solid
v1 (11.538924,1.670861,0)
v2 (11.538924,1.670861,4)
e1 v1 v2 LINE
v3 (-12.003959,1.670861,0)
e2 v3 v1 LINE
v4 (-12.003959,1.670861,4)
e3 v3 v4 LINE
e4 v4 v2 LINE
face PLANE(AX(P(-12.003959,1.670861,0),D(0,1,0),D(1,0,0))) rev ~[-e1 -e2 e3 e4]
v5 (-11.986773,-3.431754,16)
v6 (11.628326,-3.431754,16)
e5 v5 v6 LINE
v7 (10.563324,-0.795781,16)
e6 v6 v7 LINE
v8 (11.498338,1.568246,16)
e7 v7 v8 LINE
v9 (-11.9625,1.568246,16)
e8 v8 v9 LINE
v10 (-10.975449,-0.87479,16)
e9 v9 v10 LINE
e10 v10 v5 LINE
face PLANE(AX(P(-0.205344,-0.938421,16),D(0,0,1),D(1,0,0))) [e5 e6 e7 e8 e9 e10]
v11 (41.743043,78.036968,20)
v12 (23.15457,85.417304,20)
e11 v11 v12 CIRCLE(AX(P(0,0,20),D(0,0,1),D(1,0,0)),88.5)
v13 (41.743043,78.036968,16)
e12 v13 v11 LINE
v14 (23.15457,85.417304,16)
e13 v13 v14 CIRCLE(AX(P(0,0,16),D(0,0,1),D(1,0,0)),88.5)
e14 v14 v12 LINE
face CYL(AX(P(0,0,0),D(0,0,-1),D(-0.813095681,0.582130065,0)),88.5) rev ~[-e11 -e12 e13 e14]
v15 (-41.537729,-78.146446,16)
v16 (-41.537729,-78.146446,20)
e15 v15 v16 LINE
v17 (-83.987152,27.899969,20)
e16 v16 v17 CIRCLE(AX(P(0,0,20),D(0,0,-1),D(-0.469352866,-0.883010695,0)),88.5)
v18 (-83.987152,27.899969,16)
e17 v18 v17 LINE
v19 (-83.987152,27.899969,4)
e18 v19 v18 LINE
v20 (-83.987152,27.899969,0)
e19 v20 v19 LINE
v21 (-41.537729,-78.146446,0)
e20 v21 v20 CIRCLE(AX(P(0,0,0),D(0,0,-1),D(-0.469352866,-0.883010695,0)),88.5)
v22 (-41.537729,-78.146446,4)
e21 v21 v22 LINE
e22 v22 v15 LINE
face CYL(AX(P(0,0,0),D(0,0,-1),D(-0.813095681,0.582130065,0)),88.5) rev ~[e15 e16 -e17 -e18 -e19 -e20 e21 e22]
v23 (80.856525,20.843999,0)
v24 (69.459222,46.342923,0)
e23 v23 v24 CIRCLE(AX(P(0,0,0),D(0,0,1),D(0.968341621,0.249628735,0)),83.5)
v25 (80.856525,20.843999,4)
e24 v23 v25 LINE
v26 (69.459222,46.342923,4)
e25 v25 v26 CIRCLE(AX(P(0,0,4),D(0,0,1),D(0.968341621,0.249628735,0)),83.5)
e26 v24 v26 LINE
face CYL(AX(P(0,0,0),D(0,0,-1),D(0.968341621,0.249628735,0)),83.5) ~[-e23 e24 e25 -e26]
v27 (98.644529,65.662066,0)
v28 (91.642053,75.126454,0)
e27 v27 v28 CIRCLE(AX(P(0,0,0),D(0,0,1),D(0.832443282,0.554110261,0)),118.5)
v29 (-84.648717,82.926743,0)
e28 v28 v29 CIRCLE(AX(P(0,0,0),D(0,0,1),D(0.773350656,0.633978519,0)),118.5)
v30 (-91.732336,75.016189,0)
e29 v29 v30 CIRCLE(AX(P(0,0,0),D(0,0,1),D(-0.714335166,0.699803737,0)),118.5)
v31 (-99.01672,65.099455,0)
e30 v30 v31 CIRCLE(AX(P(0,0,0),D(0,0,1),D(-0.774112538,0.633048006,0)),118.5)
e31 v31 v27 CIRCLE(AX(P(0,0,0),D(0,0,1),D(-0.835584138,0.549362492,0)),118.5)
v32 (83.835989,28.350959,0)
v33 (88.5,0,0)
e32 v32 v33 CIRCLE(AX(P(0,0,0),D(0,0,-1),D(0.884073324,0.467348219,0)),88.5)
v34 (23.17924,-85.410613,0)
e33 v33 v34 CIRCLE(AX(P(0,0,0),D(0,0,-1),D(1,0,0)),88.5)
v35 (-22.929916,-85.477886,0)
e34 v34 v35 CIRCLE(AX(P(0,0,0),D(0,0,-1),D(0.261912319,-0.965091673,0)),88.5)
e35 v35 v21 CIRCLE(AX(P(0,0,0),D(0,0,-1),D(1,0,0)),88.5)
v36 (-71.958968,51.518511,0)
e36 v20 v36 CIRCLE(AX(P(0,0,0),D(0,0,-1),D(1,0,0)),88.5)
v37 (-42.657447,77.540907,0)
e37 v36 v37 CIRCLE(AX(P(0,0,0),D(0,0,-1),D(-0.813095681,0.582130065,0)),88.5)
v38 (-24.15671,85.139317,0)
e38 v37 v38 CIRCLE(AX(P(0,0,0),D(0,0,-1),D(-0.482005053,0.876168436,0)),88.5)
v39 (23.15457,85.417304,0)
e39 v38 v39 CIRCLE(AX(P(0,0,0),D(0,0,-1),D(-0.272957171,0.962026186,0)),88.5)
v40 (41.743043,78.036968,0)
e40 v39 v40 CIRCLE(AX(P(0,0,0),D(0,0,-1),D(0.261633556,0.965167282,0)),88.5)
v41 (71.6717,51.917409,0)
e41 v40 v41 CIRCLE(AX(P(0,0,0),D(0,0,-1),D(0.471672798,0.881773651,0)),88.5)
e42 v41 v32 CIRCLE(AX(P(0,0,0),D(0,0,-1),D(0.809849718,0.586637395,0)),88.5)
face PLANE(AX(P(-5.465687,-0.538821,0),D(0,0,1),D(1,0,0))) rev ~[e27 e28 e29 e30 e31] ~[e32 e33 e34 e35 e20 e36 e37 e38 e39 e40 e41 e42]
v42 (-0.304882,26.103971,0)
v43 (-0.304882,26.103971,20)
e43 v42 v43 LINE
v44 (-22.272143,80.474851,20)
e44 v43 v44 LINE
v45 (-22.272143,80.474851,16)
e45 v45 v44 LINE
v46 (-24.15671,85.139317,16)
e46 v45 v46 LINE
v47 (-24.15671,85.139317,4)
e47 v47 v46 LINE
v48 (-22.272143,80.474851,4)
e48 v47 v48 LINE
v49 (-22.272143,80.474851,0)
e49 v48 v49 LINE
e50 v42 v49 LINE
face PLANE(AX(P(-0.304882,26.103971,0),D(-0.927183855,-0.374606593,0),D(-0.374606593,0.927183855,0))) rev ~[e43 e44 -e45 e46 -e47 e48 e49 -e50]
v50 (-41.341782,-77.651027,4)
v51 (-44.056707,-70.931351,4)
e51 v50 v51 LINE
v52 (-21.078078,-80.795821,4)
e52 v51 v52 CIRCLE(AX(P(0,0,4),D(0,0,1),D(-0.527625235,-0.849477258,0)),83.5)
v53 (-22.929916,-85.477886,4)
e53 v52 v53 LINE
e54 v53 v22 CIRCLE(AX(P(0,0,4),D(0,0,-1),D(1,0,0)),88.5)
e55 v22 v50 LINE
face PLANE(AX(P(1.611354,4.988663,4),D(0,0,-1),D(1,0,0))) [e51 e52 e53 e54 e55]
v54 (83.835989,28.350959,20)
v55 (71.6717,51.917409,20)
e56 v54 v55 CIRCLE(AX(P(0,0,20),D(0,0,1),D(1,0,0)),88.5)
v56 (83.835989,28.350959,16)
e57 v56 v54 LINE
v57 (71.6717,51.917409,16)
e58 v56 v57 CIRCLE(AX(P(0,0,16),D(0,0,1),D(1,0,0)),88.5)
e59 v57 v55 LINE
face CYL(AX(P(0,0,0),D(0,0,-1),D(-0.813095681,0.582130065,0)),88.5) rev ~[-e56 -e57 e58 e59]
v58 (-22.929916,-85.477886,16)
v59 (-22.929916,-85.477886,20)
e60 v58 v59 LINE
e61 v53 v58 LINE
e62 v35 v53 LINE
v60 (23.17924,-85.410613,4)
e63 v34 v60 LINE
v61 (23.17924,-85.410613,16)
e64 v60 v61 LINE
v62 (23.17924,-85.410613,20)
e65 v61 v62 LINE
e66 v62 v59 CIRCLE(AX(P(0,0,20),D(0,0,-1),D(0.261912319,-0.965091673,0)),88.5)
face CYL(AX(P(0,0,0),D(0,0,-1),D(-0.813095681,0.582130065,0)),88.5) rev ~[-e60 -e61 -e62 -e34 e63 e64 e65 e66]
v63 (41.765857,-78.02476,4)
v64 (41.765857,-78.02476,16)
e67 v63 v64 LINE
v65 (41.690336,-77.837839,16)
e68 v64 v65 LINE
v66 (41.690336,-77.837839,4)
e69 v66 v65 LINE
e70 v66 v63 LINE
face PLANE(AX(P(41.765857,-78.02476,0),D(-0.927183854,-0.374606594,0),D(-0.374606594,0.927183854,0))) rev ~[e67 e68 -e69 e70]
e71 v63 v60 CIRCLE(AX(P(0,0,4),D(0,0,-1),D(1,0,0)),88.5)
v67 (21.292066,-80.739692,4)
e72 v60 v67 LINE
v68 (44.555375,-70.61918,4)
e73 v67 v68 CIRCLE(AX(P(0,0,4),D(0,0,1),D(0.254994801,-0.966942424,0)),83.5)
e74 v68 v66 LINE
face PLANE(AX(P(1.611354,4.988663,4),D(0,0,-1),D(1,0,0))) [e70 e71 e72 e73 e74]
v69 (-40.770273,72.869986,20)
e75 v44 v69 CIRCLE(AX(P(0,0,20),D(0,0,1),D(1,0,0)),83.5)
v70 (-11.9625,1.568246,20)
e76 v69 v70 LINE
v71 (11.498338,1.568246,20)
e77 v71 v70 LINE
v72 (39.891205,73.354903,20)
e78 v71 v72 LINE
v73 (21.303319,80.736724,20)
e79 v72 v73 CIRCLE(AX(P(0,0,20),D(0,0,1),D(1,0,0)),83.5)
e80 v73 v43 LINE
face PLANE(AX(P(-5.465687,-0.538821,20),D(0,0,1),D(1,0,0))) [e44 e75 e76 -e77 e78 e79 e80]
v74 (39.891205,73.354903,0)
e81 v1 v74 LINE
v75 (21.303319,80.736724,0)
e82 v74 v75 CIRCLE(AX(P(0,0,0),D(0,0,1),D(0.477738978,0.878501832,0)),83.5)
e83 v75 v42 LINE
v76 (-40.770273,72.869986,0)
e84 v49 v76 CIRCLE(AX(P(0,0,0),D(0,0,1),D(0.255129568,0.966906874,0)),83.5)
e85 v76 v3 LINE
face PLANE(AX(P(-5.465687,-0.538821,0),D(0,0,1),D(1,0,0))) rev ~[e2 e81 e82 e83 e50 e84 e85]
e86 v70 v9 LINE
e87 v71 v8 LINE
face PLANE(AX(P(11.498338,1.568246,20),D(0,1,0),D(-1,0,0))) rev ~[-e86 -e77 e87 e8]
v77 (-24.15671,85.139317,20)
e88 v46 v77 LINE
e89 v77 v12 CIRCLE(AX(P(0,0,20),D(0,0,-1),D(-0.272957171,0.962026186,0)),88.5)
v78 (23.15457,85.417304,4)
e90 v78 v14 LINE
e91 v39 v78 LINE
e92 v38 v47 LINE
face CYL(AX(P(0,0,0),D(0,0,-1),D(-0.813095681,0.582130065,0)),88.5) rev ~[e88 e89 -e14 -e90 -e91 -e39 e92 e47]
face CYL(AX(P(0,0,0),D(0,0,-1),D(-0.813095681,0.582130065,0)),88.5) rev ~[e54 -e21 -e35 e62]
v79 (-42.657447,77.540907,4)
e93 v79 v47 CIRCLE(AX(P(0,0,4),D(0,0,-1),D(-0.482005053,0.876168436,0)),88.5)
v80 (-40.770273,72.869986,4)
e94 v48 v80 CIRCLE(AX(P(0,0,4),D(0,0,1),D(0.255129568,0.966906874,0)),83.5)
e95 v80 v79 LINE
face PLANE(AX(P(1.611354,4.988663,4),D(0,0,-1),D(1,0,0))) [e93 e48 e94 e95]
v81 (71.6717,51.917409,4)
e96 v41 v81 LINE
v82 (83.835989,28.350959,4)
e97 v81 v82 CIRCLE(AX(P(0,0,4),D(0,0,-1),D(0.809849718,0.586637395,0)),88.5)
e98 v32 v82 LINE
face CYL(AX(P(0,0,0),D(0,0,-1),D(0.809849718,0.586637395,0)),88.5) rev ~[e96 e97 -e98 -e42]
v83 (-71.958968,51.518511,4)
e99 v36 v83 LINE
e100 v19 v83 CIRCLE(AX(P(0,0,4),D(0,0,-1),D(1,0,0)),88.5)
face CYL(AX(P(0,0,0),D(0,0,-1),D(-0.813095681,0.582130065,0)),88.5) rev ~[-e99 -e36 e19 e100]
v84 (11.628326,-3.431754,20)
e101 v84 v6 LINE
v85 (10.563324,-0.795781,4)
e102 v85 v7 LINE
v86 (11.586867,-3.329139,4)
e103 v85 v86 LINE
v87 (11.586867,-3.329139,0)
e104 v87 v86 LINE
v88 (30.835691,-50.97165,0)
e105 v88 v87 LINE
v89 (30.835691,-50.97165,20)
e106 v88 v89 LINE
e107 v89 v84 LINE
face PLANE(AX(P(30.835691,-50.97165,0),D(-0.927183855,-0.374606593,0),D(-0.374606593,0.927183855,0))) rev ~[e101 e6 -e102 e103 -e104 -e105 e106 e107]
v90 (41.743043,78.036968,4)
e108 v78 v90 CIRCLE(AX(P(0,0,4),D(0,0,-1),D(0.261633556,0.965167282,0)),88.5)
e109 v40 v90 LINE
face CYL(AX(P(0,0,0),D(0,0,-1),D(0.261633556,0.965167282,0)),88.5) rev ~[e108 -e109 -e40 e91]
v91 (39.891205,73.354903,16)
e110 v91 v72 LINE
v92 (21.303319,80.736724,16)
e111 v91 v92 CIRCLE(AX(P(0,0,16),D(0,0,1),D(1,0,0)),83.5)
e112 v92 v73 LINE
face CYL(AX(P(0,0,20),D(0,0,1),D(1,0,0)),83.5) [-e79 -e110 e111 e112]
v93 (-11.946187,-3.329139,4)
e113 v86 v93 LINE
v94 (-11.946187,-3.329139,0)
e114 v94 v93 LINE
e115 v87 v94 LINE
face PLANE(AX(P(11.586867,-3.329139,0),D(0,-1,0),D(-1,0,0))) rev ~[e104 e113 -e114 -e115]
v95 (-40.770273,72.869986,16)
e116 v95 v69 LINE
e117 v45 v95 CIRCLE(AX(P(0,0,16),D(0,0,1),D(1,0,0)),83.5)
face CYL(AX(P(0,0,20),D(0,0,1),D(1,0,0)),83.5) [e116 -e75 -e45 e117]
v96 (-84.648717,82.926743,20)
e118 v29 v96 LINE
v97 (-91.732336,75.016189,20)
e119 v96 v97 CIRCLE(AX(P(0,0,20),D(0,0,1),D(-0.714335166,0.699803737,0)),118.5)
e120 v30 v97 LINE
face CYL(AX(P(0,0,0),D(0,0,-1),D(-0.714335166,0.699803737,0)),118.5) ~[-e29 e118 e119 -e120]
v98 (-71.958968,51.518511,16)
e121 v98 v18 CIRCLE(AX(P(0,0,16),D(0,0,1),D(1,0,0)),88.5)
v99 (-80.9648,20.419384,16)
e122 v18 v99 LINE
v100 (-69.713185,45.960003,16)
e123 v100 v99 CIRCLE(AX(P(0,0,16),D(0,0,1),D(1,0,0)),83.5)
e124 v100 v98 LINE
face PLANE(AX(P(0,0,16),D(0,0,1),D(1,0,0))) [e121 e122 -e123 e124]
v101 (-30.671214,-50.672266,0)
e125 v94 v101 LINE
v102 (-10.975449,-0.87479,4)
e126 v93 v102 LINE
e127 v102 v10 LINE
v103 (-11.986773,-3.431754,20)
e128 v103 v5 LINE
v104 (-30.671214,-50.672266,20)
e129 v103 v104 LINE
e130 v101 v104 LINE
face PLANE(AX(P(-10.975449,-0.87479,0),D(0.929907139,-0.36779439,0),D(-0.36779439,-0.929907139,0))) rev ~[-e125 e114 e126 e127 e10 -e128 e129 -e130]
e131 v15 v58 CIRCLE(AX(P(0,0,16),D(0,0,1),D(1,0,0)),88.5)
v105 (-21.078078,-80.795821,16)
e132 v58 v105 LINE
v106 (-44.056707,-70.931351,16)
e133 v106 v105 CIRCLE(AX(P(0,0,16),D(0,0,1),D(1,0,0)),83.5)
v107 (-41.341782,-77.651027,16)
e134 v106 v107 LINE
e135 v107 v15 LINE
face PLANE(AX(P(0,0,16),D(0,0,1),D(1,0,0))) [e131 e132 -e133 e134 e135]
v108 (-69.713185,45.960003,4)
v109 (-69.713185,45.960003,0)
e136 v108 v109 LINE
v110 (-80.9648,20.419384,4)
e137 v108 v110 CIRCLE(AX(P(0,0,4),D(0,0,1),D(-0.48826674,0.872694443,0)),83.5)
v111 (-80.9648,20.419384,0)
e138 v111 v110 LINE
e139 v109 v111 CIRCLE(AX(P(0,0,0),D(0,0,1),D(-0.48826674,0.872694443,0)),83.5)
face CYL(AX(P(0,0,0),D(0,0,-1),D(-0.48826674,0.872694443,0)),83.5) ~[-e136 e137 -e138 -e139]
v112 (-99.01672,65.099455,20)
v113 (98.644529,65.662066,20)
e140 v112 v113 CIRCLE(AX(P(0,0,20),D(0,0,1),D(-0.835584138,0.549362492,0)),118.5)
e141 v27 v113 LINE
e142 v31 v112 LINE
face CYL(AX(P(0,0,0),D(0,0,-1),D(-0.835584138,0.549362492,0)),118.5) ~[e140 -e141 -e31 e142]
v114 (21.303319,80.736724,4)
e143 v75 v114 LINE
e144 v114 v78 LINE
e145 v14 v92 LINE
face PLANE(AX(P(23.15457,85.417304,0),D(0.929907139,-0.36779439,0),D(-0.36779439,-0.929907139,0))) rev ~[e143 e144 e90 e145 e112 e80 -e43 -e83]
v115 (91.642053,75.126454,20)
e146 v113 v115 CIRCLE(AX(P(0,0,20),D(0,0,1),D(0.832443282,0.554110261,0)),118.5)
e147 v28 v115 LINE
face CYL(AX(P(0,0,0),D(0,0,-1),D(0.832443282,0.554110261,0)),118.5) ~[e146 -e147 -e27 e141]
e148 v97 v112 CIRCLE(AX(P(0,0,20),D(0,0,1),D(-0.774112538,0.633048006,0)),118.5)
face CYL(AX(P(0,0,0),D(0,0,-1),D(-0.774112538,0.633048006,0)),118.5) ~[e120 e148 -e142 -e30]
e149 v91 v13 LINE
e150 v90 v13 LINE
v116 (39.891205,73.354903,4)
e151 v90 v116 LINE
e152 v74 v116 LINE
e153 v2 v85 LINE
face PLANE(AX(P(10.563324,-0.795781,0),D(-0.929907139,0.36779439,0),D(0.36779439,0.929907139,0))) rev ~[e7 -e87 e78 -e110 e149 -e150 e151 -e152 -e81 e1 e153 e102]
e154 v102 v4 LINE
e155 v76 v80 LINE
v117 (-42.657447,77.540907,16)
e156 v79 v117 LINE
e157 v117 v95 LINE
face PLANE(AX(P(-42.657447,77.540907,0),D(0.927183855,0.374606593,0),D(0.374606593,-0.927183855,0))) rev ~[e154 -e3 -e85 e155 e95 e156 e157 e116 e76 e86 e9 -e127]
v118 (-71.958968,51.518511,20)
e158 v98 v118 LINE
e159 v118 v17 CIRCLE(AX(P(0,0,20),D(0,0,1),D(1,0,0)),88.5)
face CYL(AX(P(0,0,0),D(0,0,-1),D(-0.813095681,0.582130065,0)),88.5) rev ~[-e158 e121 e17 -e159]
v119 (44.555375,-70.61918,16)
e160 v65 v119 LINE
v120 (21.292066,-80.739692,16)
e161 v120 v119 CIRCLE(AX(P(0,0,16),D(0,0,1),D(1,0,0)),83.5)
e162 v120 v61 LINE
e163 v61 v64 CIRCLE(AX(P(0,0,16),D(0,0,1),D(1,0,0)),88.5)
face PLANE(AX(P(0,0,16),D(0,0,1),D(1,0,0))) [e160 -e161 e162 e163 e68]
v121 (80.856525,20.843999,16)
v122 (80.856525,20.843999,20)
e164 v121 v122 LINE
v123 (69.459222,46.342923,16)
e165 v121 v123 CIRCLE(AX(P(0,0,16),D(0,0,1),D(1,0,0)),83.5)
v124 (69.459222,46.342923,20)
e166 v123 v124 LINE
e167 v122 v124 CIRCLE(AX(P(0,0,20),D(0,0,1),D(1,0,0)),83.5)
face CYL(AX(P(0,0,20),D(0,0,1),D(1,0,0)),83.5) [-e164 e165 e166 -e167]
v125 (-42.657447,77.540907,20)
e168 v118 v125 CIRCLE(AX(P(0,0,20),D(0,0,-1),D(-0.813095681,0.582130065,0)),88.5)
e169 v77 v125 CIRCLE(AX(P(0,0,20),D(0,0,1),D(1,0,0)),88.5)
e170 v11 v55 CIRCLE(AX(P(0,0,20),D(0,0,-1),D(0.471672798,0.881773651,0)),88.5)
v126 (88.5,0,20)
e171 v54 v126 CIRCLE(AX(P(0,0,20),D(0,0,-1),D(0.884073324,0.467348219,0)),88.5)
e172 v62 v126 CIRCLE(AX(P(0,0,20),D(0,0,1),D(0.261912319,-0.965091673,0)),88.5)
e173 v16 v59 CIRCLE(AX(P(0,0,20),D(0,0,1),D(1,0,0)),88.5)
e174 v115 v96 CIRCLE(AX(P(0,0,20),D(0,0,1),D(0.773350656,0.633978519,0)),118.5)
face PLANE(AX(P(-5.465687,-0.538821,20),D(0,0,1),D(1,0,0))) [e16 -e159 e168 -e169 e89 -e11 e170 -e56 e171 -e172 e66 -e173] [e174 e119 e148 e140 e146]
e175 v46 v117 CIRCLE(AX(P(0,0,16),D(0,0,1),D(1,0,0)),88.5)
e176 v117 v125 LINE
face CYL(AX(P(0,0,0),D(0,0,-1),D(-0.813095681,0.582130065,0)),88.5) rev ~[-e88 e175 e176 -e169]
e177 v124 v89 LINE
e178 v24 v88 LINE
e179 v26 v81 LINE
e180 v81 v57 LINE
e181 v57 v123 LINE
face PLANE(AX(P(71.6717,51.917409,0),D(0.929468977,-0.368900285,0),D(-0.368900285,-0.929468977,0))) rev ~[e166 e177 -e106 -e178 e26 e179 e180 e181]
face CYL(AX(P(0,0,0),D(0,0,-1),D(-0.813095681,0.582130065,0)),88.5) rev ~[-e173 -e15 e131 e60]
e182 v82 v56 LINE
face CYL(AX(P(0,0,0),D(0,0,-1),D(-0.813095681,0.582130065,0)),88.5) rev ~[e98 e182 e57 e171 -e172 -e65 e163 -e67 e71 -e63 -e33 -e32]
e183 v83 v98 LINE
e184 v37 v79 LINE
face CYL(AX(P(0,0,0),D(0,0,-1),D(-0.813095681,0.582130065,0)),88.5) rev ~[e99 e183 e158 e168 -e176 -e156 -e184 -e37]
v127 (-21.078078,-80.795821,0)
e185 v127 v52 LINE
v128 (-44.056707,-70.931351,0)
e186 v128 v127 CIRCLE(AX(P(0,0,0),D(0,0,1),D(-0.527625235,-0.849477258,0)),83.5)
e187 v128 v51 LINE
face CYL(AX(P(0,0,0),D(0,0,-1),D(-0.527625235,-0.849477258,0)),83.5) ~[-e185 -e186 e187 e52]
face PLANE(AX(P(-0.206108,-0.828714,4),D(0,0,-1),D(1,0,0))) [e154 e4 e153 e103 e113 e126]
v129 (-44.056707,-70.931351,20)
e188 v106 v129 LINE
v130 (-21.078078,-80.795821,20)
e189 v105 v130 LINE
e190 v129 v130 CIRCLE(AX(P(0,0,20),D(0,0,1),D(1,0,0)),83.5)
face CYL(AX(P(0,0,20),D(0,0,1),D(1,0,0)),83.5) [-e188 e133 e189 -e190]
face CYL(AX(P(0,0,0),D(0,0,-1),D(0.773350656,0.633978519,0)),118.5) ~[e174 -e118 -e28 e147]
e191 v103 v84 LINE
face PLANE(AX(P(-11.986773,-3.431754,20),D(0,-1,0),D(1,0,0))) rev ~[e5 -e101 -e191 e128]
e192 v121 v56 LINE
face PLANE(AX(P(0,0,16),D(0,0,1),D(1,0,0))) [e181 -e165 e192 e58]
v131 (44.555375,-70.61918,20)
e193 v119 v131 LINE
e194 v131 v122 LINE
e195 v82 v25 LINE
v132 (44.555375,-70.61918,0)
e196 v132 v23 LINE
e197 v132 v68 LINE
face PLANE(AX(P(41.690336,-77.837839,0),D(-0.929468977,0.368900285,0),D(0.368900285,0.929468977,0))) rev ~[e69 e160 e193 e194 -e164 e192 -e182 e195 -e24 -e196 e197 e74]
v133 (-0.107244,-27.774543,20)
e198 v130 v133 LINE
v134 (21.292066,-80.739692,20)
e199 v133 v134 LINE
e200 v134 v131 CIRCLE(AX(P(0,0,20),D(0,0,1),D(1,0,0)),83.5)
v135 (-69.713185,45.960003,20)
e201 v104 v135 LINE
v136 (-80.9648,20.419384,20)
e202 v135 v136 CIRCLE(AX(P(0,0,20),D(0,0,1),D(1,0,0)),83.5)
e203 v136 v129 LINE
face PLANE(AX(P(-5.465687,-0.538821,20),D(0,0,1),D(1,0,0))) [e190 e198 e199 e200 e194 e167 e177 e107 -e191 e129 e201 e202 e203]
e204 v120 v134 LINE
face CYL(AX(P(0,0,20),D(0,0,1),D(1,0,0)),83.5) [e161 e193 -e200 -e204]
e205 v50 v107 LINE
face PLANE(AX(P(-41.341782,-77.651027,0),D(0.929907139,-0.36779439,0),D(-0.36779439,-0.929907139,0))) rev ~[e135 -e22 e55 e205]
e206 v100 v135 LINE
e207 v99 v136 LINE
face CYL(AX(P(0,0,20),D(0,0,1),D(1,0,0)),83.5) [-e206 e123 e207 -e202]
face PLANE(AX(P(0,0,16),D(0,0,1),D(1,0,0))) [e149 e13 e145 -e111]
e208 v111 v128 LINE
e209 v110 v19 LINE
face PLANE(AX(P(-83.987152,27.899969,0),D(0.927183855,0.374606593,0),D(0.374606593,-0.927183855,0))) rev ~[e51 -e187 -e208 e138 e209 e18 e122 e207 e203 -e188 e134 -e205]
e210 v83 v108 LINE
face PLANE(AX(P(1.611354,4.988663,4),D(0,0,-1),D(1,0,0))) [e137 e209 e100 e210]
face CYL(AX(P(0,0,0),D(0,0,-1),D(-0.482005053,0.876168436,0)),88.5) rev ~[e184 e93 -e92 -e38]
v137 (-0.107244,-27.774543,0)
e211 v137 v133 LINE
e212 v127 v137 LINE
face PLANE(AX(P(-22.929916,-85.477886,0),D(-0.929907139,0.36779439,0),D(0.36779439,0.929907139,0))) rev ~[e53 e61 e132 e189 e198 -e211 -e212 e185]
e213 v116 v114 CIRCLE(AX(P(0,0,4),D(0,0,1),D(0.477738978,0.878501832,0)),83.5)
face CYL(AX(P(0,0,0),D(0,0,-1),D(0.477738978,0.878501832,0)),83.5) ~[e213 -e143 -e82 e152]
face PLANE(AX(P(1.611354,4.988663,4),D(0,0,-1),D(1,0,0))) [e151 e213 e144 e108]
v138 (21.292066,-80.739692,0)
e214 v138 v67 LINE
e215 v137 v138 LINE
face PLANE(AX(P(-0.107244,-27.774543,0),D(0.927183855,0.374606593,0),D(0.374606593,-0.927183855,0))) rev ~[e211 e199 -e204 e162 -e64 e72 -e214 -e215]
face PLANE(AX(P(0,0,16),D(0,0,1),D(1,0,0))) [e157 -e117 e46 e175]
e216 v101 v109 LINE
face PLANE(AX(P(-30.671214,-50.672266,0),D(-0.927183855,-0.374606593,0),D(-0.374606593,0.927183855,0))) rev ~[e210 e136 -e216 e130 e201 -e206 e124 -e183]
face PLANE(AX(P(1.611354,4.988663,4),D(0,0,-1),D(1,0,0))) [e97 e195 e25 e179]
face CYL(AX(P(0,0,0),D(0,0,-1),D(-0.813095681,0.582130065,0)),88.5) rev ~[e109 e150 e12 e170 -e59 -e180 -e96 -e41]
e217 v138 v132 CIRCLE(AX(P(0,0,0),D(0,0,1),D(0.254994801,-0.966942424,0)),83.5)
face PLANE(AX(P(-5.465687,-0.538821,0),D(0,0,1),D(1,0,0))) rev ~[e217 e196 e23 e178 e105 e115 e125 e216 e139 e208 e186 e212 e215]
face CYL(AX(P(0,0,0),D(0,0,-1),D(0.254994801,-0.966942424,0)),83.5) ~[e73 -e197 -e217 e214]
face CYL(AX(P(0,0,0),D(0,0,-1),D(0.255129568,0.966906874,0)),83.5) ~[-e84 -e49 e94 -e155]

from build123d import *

# Parameters (mm, degrees)
F1_DEPTH  = 20
F3_DEPTH  = 20
F2_R      = 88.5
F2_R_2    = 83.5
F4_DEPTH  = 4
F6_DEPTH  = 4
F8_DEPTH  = 4
F10_DEPTH = 4


with BuildPart() as f1:
    # F0 (on Top) → F1 (new body)
    with BuildSketch(Plane.XY):
        with BuildLine():
            ThreePointArc((-99.0167204009, 65.0994553054), (-33.976231637, -113.5247359995), (118.5, 0))
            ThreePointArc((118.5, 0), (113.427568701, 34.2992224195), (98.6445289691, 65.6620659473))
            Line((98.6445289691, 65.6620659473), (83.8359894773, 28.3509588615))
            ThreePointArc((83.8359894773, 28.3509588615), (87.3262133289, 14.3660177374), (88.5, 0))
            ThreePointArc((88.5, 0), (75.9227513097, -45.4751122436), (41.7658568686, -78.0247601729))
            ThreePointArc((41.7658568686, -78.0247601729), (37.4975464632, -80.1634830159), (33.1201145514, -82.0689223282))
            ThreePointArc((33.1201145514, -82.0689223282), (28.1992209584, -83.8871500132), (23.1792402745, -85.4106130425))
            ThreePointArc((23.1792402745, -85.4106130425), (0.1291202837, -88.4999058076), (-22.9299160381, -85.4778857395))
            ThreePointArc((-22.9299160381, -85.4778857395), (-27.7305413867, -84.0432452634), (-32.4422838504, -82.3392264876))
            ThreePointArc((-32.4422838504, -82.3392264876), (-37.0493645428, -80.3716031131), (-41.5377286395, -78.1464464929))
            ThreePointArc((-41.5377286395, -78.1464464929), (-82.1619405668, -32.888683803), (-83.9871522499, 27.8999687625))
            Line((-83.9871522499, 27.8999687625), (-99.0167204009, 65.0994553054))
        make_face()
        with BuildLine():
            Line((83.8359894773, 28.3509588615), (98.6445289691, 65.6620659473))
            ThreePointArc((98.6445289691, 65.6620659473), (95.2609020622, 70.4812779275), (91.6420527878, 75.1264544673))
            Line((91.6420527878, 75.1264544673), (78.2404891828, 41.3603173639))
            ThreePointArc((78.2404891828, 41.3603173639), (81.2988750591, 34.9677410499), (83.8359894773, 28.3509588615))
        make_face()
        with BuildLine():
            ThreePointArc((-91.7323358048, 75.0161887049), (-95.5033298433, 70.1524339481), (-99.0167204009, 65.0994553054))
            Line((-99.0167204009, 65.0994553054), (-83.9871522499, 27.8999687625))
            ThreePointArc((-83.9871522499, 27.8999687625), (-81.3673031633, 34.8082170749), (-78.1803580333, 41.4738666848))
            Line((-78.1803580333, 41.4738666848), (-91.7323358048, 75.0161887049))
        make_face()
        with BuildLine():
            Line((78.2404891828, 41.3603173639), (91.6420527878, 75.1264544673))
            ThreePointArc((91.6420527878, 75.1264544673), (88.0042632721, 79.3567870187), (84.1713836102, 83.4111993748))
            Line((84.1713836102, 83.4111993748), (71.6717000696, 51.9174094994))
            ThreePointArc((71.6717000696, 51.9174094994), (75.141727224, 46.7543669597), (78.2404891828, 41.3603173639))
        make_face()
        with BuildLine():
            ThreePointArc((-84.6487172303, 82.9267427991), (-88.279177522, 79.0508495593), (-91.7323358048, 75.0161887049))
            Line((-91.7323358048, 75.0161887049), (-78.1803580333, 41.4738666848))
            ThreePointArc((-78.1803580333, 41.4738666848), (-75.2374774209, 46.6001286623), (-71.9589677924, 51.5185107923))
            Line((-71.9589677924, 51.5185107923), (-84.6487172303, 82.9267427991))
        make_face()
        with BuildLine():
            Line((71.6717000696, 51.9174094994), (84.1713836102, 83.4111993748))
            ThreePointArc((84.1713836102, 83.4111993748), (-0.34005351, 118.4995120817), (-84.6487172303, 82.9267427991))
            Line((-84.6487172303, 82.9267427991), (-71.9589677924, 51.5185107923))
            ThreePointArc((-71.9589677924, 51.5185107923), (-58.7666735297, 66.1719584285), (-42.657447205, 77.5409066104))
            ThreePointArc((-42.657447205, 77.5409066104), (-37.9880889567, 79.9321906207), (-33.1852472612, 82.0426070052))
            ThreePointArc((-33.1852472612, 82.0426070052), (-28.7127568961, 83.7127683894), (-24.1567096164, 85.1393174774))
            ThreePointArc((-24.1567096164, 85.1393174774), (-0.5199906824, 88.4984723579), (23.1545696711, 85.4173044725))
            ThreePointArc((23.1545696711, 85.4173044725), (27.9506996195, 83.9702827837), (32.6572676565, 82.2541966663))
            ThreePointArc((32.6572676565, 82.2541966663), (37.2598684434, 80.274231255), (41.7430426186, 78.0369681173))
            ThreePointArc((41.7430426186, 78.0369681173), (58.1917846466, 66.6780788538), (71.6717000696, 51.9174094994))
        make_face()
    extrude(amount=F1_DEPTH)

    # F0 (on Top) → F3 (join)
    with BuildSketch(Plane.XY):
        Polygon((-5.3900272877, 13.2470234608), (-10.9754492604, -0.8747899922), (-5.5413465001, -14.3246662942), (0.0440754726, -0.2028528412), align=None)
        Polygon((-5.5413465001, -14.3246662942), (-0.1072437399, -27.7745425962), (5.4781782329, -13.6527291432), (0.0440754726, -0.2028528412), align=None)
        Polygon((5.4781782329, -13.6527291432), (10.5633239718, -0.7957812068), (5.1292212115, 12.6540950952), (0.0440754726, -0.2028528412), align=None)
        Polygon((0.0440754726, -0.2028528412), (5.1292212115, 12.6540950952), (-0.3048815487, 26.1039713972), (-5.3900272877, 13.2470234608), align=None)
        Polygon((-10.9754492604, -0.8747899922), (-30.6712140088, -50.6722658047), (-25.2371112485, -64.1221421067), (-5.5413465001, -14.3246662942), align=None)
        with BuildLine():
            Line((-25.2371112485, -64.1221421067), (-32.4422838504, -82.3392264876))
            ThreePointArc((-32.4422838504, -82.3392264876), (-27.7305413867, -84.0432452634), (-22.9299160381, -85.4778857395))
            Line((-22.9299160381, -85.4778857395), (-0.1072437399, -27.7745425962))
            Line((-0.1072437399, -27.7745425962), (-5.5413465001, -14.3246662942))
            Line((-5.5413465001, -14.3246662942), (-25.2371112485, -64.1221421067))
        make_face()
        with BuildLine():
            Line((-41.3417817205, -77.6510271941), (-41.5377286395, -78.1464464929))
            ThreePointArc((-41.5377286395, -78.1464464929), (-37.0493645428, -80.3716031131), (-32.4422838504, -82.3392264876))
            Line((-32.4422838504, -82.3392264876), (-25.2371112485, -64.1221421067))
            Line((-25.2371112485, -64.1221421067), (-30.6712140088, -50.6722658047))
            Line((-30.6712140088, -50.6722658047), (-35.7563597477, -63.5292137411))
            Line((-35.7563597477, -63.5292137411), (-41.3417817205, -77.6510271941))
        make_face()
        with BuildLine():
            ThreePointArc((-71.9589677924, 51.5185107923), (-75.2374774209, 46.6001286623), (-78.1803580333, 41.4738666848))
            Line((-78.1803580333, 41.4738666848), (-35.7563597477, -63.5292137411))
            Line((-35.7563597477, -63.5292137411), (-30.6712140088, -50.6722658047))
            Line((-30.6712140088, -50.6722658047), (-71.9589677924, 51.5185107923))
        make_face()
        with BuildLine():
            ThreePointArc((-78.1803580333, 41.4738666848), (-81.3673031633, 34.8082170749), (-83.9871522499, 27.8999687625))
            Line((-83.9871522499, 27.8999687625), (-41.3417817205, -77.6510271941))
            Line((-41.3417817205, -77.6510271941), (-35.7563597477, -63.5292137411))
            Line((-35.7563597477, -63.5292137411), (-78.1803580333, 41.4738666848))
        make_face()
        with BuildLine():
            Line((5.1292212115, 12.6540950952), (32.6572676565, 82.2541966663))
            ThreePointArc((32.6572676565, 82.2541966663), (27.9506996195, 83.9702827837), (23.1545696711, 85.4173044725))
            Line((23.1545696711, 85.4173044725), (-0.3048815487, 26.1039713972))
            Line((-0.3048815487, 26.1039713972), (5.1292212115, 12.6540950952))
        make_face()
        with BuildLine():
            Line((10.5633239718, -0.7957812068), (41.7430426186, 78.0369681173))
            ThreePointArc((41.7430426186, 78.0369681173), (37.2598684434, 80.274231255), (32.6572676565, 82.2541966663))
            Line((32.6572676565, 82.2541966663), (5.1292212115, 12.6540950952))
            Line((5.1292212115, 12.6540950952), (10.5633239718, -0.7957812068))
        make_face()
        with BuildLine():
            ThreePointArc((-33.1852472612, 82.0426070052), (-37.9880889567, 79.9321906207), (-42.657447205, 77.5409066104))
            Line((-42.657447205, 77.5409066104), (-10.9754492604, -0.8747899922))
            Line((-10.9754492604, -0.8747899922), (-5.3900272877, 13.2470234608))
            Line((-5.3900272877, 13.2470234608), (-33.1852472612, 82.0426070052))
        make_face()
        with BuildLine():
            ThreePointArc((-24.1567096164, 85.1393174774), (-28.7127568961, 83.7127683894), (-33.1852472612, 82.0426070052))
            Line((-33.1852472612, 82.0426070052), (-5.3900272877, 13.2470234608))
            Line((-5.3900272877, 13.2470234608), (-0.3048815487, 26.1039713972))
            Line((-0.3048815487, 26.1039713972), (-24.1567096164, 85.1393174774))
        make_face()
        with BuildLine():
            ThreePointArc((23.1792402745, -85.4106130425), (28.1992209584, -83.8871500132), (33.1201145514, -82.0689223282))
            Line((33.1201145514, -82.0689223282), (25.7416192077, -63.806505505))
            Line((25.7416192077, -63.806505505), (5.4781782329, -13.6527291432))
            Line((5.4781782329, -13.6527291432), (-0.1072437399, -27.7745425962))
            Line((-0.1072437399, -27.7745425962), (23.1792402745, -85.4106130425))
        make_face()
        Polygon((25.7416192077, -63.806505505), (30.8356910223, -50.971650381), (10.5633239718, -0.7957812068), (5.4781782329, -13.6527291432), align=None)
        with BuildLine():
            Line((41.7658568686, -78.0247601729), (41.6903356821, -77.8378386773))
            Line((41.6903356821, -77.8378386773), (36.2630133522, -64.4047445292))
            Line((36.2630133522, -64.4047445292), (30.8356910223, -50.971650381))
            Line((30.8356910223, -50.971650381), (25.7416192077, -63.806505505))
            Line((25.7416192077, -63.806505505), (33.1201145514, -82.0689223282))
            ThreePointArc((33.1201145514, -82.0689223282), (37.4975464632, -80.1634830159), (41.7658568686, -78.0247601729))
        make_face()
        with BuildLine():
            Line((41.6903356821, -77.8378386773), (83.8359894773, 28.3509588615))
            ThreePointArc((83.8359894773, 28.3509588615), (81.2988750591, 34.9677410499), (78.2404891828, 41.3603173639))
            Line((78.2404891828, 41.3603173639), (36.2630133522, -64.4047445292))
            Line((36.2630133522, -64.4047445292), (41.6903356821, -77.8378386773))
        make_face()
        with BuildLine():
            Line((36.2630133522, -64.4047445292), (78.2404891828, 41.3603173639))
            ThreePointArc((78.2404891828, 41.3603173639), (75.141727224, 46.7543669597), (71.6717000696, 51.9174094994))
            Line((71.6717000696, 51.9174094994), (30.8356910223, -50.971650381))
            Line((30.8356910223, -50.971650381), (36.2630133522, -64.4047445292))
        make_face()
    extrude(amount=F3_DEPTH)

    # F2 (on face) → F4 (cut)
    with BuildSketch(Plane.XY.offset(20)):
        Circle(F2_R)
        Circle(F2_R_2, mode=Mode.SUBTRACT)
    extrude(amount=-F4_DEPTH, mode=Mode.SUBTRACT)

    # F5 (on face) → F6 (cut)
    with BuildSketch(Plane(origin=(0, 0, 0), x_dir=(1, 0, 0), z_dir=(0, 0, -1))):
        with BuildLine():
            ThreePointArc((83.8359894773, -28.3509588615), (87.3262133289, -14.3660177374), (88.5, 0))
            ThreePointArc((88.5, 0), (-27.0544021406, 84.2633332168), (-71.9589677924, -51.5185107923))
            ThreePointArc((-71.9589677924, -51.5185107923), (-58.7666735297, -66.1719584285), (-42.657447205, -77.5409066104))
            ThreePointArc((-42.657447205, -77.5409066104), (-33.6224158838, -81.8644193172), (-24.1567096164, -85.1393174774))
            ThreePointArc((-24.1567096164, -85.1393174774), (-0.5199906824, -88.4984723579), (23.1545696711, -85.4173044725))
            ThreePointArc((23.1545696711, -85.4173044725), (32.6579601538, -82.2539217217), (41.7430426186, -78.0369681173))
            ThreePointArc((41.7430426186, -78.0369681173), (58.1917846466, -66.6780788538), (71.6717000696, -51.9174094994))
            ThreePointArc((71.6717000696, -51.9174094994), (78.6416224144, -40.5924281613), (83.8359894773, -28.3509588615))
        make_face()
        with BuildLine():
            ThreePointArc((44.555375213, 70.6191796868), (73.1184786162, 40.3229225734), (83.5, 0))
            ThreePointArc((83.5, 0), (82.836495174, -10.5054779659), (80.8565253343, -20.843999397))
            ThreePointArc((80.8565253343, -20.843999397), (76.2315862582, -34.0733804687), (69.4592219568, -46.3429227084))
            ThreePointArc((69.4592219568, -46.3429227084), (56.3186534083, -61.6478651559), (39.8912046999, -73.3549029554))
            ThreePointArc((39.8912046999, -73.3549029554), (30.8190728646, -77.6043474798), (21.3033189694, -80.7367239915))
            ThreePointArc((21.3033189694, -80.7367239915), (-0.501796062, -83.4984922062), (-22.2721428532, -80.4748510575))
            ThreePointArc((-22.2721428532, -80.4748510575), (-31.7497249631, -77.2282653228), (-40.7702727747, -72.8699859879))
            ThreePointArc((-40.7702727747, -72.8699859879), (-56.8567093495, -61.1519795423), (-69.7131848128, -45.9600028639))
            ThreePointArc((-69.7131848128, -45.9600028639), (-76.4136411743, -33.6631169454), (-80.9647996196, -20.4193835008))
            ThreePointArc((-80.9647996196, -20.4193835008), (-77.4198518563, 31.2796505502), (-44.0567071244, 70.9313510188))
            ThreePointArc((-44.0567071244, 70.9313510188), (-32.938761393, 76.7286647733), (-21.0780781193, 80.7958205775))
            ThreePointArc((-21.0780781193, 80.7958205775), (0.1106131959, 83.4999267348), (21.2920658442, 80.7396924201))
            ThreePointArc((21.2920658442, 80.7396924201), (33.3103222431, 76.5680901685), (44.555375213, 70.6191796868))
        make_face(mode=Mode.SUBTRACT)
    extrude(amount=-F6_DEPTH, mode=Mode.SUBTRACT)

    # F7 (on face) → F8 (cut)
    with BuildSketch(Plane.XY.offset(20)):
        Polygon((11.4983377003, 1.5682459902), (-11.9624998679, 1.5682459902), (-10.9754492604, -0.8747899922), (-11.9867728454, -3.4317540098), (11.6283261148, -3.4317540098), (10.5633239718, -0.7957812068), align=None)
    extrude(amount=-F8_DEPTH, mode=Mode.SUBTRACT)

    # F9 (on face) → F10 (cut)
    with BuildSketch(Plane(origin=(0, 0, 0), x_dir=(1, 0, 0), z_dir=(0, 0, -1))):
        Polygon((11.5868667585, 3.329138502), (-11.9461866336, 3.329138502), (-10.9754492604, 0.8747899922), (-12.0039592243, -1.670861498), (11.5389239122, -1.670861498), (10.5633239718, 0.7957812068), align=None)
    extrude(amount=-F10_DEPTH, mode=Mode.SUBTRACT)


solid = f1.part
